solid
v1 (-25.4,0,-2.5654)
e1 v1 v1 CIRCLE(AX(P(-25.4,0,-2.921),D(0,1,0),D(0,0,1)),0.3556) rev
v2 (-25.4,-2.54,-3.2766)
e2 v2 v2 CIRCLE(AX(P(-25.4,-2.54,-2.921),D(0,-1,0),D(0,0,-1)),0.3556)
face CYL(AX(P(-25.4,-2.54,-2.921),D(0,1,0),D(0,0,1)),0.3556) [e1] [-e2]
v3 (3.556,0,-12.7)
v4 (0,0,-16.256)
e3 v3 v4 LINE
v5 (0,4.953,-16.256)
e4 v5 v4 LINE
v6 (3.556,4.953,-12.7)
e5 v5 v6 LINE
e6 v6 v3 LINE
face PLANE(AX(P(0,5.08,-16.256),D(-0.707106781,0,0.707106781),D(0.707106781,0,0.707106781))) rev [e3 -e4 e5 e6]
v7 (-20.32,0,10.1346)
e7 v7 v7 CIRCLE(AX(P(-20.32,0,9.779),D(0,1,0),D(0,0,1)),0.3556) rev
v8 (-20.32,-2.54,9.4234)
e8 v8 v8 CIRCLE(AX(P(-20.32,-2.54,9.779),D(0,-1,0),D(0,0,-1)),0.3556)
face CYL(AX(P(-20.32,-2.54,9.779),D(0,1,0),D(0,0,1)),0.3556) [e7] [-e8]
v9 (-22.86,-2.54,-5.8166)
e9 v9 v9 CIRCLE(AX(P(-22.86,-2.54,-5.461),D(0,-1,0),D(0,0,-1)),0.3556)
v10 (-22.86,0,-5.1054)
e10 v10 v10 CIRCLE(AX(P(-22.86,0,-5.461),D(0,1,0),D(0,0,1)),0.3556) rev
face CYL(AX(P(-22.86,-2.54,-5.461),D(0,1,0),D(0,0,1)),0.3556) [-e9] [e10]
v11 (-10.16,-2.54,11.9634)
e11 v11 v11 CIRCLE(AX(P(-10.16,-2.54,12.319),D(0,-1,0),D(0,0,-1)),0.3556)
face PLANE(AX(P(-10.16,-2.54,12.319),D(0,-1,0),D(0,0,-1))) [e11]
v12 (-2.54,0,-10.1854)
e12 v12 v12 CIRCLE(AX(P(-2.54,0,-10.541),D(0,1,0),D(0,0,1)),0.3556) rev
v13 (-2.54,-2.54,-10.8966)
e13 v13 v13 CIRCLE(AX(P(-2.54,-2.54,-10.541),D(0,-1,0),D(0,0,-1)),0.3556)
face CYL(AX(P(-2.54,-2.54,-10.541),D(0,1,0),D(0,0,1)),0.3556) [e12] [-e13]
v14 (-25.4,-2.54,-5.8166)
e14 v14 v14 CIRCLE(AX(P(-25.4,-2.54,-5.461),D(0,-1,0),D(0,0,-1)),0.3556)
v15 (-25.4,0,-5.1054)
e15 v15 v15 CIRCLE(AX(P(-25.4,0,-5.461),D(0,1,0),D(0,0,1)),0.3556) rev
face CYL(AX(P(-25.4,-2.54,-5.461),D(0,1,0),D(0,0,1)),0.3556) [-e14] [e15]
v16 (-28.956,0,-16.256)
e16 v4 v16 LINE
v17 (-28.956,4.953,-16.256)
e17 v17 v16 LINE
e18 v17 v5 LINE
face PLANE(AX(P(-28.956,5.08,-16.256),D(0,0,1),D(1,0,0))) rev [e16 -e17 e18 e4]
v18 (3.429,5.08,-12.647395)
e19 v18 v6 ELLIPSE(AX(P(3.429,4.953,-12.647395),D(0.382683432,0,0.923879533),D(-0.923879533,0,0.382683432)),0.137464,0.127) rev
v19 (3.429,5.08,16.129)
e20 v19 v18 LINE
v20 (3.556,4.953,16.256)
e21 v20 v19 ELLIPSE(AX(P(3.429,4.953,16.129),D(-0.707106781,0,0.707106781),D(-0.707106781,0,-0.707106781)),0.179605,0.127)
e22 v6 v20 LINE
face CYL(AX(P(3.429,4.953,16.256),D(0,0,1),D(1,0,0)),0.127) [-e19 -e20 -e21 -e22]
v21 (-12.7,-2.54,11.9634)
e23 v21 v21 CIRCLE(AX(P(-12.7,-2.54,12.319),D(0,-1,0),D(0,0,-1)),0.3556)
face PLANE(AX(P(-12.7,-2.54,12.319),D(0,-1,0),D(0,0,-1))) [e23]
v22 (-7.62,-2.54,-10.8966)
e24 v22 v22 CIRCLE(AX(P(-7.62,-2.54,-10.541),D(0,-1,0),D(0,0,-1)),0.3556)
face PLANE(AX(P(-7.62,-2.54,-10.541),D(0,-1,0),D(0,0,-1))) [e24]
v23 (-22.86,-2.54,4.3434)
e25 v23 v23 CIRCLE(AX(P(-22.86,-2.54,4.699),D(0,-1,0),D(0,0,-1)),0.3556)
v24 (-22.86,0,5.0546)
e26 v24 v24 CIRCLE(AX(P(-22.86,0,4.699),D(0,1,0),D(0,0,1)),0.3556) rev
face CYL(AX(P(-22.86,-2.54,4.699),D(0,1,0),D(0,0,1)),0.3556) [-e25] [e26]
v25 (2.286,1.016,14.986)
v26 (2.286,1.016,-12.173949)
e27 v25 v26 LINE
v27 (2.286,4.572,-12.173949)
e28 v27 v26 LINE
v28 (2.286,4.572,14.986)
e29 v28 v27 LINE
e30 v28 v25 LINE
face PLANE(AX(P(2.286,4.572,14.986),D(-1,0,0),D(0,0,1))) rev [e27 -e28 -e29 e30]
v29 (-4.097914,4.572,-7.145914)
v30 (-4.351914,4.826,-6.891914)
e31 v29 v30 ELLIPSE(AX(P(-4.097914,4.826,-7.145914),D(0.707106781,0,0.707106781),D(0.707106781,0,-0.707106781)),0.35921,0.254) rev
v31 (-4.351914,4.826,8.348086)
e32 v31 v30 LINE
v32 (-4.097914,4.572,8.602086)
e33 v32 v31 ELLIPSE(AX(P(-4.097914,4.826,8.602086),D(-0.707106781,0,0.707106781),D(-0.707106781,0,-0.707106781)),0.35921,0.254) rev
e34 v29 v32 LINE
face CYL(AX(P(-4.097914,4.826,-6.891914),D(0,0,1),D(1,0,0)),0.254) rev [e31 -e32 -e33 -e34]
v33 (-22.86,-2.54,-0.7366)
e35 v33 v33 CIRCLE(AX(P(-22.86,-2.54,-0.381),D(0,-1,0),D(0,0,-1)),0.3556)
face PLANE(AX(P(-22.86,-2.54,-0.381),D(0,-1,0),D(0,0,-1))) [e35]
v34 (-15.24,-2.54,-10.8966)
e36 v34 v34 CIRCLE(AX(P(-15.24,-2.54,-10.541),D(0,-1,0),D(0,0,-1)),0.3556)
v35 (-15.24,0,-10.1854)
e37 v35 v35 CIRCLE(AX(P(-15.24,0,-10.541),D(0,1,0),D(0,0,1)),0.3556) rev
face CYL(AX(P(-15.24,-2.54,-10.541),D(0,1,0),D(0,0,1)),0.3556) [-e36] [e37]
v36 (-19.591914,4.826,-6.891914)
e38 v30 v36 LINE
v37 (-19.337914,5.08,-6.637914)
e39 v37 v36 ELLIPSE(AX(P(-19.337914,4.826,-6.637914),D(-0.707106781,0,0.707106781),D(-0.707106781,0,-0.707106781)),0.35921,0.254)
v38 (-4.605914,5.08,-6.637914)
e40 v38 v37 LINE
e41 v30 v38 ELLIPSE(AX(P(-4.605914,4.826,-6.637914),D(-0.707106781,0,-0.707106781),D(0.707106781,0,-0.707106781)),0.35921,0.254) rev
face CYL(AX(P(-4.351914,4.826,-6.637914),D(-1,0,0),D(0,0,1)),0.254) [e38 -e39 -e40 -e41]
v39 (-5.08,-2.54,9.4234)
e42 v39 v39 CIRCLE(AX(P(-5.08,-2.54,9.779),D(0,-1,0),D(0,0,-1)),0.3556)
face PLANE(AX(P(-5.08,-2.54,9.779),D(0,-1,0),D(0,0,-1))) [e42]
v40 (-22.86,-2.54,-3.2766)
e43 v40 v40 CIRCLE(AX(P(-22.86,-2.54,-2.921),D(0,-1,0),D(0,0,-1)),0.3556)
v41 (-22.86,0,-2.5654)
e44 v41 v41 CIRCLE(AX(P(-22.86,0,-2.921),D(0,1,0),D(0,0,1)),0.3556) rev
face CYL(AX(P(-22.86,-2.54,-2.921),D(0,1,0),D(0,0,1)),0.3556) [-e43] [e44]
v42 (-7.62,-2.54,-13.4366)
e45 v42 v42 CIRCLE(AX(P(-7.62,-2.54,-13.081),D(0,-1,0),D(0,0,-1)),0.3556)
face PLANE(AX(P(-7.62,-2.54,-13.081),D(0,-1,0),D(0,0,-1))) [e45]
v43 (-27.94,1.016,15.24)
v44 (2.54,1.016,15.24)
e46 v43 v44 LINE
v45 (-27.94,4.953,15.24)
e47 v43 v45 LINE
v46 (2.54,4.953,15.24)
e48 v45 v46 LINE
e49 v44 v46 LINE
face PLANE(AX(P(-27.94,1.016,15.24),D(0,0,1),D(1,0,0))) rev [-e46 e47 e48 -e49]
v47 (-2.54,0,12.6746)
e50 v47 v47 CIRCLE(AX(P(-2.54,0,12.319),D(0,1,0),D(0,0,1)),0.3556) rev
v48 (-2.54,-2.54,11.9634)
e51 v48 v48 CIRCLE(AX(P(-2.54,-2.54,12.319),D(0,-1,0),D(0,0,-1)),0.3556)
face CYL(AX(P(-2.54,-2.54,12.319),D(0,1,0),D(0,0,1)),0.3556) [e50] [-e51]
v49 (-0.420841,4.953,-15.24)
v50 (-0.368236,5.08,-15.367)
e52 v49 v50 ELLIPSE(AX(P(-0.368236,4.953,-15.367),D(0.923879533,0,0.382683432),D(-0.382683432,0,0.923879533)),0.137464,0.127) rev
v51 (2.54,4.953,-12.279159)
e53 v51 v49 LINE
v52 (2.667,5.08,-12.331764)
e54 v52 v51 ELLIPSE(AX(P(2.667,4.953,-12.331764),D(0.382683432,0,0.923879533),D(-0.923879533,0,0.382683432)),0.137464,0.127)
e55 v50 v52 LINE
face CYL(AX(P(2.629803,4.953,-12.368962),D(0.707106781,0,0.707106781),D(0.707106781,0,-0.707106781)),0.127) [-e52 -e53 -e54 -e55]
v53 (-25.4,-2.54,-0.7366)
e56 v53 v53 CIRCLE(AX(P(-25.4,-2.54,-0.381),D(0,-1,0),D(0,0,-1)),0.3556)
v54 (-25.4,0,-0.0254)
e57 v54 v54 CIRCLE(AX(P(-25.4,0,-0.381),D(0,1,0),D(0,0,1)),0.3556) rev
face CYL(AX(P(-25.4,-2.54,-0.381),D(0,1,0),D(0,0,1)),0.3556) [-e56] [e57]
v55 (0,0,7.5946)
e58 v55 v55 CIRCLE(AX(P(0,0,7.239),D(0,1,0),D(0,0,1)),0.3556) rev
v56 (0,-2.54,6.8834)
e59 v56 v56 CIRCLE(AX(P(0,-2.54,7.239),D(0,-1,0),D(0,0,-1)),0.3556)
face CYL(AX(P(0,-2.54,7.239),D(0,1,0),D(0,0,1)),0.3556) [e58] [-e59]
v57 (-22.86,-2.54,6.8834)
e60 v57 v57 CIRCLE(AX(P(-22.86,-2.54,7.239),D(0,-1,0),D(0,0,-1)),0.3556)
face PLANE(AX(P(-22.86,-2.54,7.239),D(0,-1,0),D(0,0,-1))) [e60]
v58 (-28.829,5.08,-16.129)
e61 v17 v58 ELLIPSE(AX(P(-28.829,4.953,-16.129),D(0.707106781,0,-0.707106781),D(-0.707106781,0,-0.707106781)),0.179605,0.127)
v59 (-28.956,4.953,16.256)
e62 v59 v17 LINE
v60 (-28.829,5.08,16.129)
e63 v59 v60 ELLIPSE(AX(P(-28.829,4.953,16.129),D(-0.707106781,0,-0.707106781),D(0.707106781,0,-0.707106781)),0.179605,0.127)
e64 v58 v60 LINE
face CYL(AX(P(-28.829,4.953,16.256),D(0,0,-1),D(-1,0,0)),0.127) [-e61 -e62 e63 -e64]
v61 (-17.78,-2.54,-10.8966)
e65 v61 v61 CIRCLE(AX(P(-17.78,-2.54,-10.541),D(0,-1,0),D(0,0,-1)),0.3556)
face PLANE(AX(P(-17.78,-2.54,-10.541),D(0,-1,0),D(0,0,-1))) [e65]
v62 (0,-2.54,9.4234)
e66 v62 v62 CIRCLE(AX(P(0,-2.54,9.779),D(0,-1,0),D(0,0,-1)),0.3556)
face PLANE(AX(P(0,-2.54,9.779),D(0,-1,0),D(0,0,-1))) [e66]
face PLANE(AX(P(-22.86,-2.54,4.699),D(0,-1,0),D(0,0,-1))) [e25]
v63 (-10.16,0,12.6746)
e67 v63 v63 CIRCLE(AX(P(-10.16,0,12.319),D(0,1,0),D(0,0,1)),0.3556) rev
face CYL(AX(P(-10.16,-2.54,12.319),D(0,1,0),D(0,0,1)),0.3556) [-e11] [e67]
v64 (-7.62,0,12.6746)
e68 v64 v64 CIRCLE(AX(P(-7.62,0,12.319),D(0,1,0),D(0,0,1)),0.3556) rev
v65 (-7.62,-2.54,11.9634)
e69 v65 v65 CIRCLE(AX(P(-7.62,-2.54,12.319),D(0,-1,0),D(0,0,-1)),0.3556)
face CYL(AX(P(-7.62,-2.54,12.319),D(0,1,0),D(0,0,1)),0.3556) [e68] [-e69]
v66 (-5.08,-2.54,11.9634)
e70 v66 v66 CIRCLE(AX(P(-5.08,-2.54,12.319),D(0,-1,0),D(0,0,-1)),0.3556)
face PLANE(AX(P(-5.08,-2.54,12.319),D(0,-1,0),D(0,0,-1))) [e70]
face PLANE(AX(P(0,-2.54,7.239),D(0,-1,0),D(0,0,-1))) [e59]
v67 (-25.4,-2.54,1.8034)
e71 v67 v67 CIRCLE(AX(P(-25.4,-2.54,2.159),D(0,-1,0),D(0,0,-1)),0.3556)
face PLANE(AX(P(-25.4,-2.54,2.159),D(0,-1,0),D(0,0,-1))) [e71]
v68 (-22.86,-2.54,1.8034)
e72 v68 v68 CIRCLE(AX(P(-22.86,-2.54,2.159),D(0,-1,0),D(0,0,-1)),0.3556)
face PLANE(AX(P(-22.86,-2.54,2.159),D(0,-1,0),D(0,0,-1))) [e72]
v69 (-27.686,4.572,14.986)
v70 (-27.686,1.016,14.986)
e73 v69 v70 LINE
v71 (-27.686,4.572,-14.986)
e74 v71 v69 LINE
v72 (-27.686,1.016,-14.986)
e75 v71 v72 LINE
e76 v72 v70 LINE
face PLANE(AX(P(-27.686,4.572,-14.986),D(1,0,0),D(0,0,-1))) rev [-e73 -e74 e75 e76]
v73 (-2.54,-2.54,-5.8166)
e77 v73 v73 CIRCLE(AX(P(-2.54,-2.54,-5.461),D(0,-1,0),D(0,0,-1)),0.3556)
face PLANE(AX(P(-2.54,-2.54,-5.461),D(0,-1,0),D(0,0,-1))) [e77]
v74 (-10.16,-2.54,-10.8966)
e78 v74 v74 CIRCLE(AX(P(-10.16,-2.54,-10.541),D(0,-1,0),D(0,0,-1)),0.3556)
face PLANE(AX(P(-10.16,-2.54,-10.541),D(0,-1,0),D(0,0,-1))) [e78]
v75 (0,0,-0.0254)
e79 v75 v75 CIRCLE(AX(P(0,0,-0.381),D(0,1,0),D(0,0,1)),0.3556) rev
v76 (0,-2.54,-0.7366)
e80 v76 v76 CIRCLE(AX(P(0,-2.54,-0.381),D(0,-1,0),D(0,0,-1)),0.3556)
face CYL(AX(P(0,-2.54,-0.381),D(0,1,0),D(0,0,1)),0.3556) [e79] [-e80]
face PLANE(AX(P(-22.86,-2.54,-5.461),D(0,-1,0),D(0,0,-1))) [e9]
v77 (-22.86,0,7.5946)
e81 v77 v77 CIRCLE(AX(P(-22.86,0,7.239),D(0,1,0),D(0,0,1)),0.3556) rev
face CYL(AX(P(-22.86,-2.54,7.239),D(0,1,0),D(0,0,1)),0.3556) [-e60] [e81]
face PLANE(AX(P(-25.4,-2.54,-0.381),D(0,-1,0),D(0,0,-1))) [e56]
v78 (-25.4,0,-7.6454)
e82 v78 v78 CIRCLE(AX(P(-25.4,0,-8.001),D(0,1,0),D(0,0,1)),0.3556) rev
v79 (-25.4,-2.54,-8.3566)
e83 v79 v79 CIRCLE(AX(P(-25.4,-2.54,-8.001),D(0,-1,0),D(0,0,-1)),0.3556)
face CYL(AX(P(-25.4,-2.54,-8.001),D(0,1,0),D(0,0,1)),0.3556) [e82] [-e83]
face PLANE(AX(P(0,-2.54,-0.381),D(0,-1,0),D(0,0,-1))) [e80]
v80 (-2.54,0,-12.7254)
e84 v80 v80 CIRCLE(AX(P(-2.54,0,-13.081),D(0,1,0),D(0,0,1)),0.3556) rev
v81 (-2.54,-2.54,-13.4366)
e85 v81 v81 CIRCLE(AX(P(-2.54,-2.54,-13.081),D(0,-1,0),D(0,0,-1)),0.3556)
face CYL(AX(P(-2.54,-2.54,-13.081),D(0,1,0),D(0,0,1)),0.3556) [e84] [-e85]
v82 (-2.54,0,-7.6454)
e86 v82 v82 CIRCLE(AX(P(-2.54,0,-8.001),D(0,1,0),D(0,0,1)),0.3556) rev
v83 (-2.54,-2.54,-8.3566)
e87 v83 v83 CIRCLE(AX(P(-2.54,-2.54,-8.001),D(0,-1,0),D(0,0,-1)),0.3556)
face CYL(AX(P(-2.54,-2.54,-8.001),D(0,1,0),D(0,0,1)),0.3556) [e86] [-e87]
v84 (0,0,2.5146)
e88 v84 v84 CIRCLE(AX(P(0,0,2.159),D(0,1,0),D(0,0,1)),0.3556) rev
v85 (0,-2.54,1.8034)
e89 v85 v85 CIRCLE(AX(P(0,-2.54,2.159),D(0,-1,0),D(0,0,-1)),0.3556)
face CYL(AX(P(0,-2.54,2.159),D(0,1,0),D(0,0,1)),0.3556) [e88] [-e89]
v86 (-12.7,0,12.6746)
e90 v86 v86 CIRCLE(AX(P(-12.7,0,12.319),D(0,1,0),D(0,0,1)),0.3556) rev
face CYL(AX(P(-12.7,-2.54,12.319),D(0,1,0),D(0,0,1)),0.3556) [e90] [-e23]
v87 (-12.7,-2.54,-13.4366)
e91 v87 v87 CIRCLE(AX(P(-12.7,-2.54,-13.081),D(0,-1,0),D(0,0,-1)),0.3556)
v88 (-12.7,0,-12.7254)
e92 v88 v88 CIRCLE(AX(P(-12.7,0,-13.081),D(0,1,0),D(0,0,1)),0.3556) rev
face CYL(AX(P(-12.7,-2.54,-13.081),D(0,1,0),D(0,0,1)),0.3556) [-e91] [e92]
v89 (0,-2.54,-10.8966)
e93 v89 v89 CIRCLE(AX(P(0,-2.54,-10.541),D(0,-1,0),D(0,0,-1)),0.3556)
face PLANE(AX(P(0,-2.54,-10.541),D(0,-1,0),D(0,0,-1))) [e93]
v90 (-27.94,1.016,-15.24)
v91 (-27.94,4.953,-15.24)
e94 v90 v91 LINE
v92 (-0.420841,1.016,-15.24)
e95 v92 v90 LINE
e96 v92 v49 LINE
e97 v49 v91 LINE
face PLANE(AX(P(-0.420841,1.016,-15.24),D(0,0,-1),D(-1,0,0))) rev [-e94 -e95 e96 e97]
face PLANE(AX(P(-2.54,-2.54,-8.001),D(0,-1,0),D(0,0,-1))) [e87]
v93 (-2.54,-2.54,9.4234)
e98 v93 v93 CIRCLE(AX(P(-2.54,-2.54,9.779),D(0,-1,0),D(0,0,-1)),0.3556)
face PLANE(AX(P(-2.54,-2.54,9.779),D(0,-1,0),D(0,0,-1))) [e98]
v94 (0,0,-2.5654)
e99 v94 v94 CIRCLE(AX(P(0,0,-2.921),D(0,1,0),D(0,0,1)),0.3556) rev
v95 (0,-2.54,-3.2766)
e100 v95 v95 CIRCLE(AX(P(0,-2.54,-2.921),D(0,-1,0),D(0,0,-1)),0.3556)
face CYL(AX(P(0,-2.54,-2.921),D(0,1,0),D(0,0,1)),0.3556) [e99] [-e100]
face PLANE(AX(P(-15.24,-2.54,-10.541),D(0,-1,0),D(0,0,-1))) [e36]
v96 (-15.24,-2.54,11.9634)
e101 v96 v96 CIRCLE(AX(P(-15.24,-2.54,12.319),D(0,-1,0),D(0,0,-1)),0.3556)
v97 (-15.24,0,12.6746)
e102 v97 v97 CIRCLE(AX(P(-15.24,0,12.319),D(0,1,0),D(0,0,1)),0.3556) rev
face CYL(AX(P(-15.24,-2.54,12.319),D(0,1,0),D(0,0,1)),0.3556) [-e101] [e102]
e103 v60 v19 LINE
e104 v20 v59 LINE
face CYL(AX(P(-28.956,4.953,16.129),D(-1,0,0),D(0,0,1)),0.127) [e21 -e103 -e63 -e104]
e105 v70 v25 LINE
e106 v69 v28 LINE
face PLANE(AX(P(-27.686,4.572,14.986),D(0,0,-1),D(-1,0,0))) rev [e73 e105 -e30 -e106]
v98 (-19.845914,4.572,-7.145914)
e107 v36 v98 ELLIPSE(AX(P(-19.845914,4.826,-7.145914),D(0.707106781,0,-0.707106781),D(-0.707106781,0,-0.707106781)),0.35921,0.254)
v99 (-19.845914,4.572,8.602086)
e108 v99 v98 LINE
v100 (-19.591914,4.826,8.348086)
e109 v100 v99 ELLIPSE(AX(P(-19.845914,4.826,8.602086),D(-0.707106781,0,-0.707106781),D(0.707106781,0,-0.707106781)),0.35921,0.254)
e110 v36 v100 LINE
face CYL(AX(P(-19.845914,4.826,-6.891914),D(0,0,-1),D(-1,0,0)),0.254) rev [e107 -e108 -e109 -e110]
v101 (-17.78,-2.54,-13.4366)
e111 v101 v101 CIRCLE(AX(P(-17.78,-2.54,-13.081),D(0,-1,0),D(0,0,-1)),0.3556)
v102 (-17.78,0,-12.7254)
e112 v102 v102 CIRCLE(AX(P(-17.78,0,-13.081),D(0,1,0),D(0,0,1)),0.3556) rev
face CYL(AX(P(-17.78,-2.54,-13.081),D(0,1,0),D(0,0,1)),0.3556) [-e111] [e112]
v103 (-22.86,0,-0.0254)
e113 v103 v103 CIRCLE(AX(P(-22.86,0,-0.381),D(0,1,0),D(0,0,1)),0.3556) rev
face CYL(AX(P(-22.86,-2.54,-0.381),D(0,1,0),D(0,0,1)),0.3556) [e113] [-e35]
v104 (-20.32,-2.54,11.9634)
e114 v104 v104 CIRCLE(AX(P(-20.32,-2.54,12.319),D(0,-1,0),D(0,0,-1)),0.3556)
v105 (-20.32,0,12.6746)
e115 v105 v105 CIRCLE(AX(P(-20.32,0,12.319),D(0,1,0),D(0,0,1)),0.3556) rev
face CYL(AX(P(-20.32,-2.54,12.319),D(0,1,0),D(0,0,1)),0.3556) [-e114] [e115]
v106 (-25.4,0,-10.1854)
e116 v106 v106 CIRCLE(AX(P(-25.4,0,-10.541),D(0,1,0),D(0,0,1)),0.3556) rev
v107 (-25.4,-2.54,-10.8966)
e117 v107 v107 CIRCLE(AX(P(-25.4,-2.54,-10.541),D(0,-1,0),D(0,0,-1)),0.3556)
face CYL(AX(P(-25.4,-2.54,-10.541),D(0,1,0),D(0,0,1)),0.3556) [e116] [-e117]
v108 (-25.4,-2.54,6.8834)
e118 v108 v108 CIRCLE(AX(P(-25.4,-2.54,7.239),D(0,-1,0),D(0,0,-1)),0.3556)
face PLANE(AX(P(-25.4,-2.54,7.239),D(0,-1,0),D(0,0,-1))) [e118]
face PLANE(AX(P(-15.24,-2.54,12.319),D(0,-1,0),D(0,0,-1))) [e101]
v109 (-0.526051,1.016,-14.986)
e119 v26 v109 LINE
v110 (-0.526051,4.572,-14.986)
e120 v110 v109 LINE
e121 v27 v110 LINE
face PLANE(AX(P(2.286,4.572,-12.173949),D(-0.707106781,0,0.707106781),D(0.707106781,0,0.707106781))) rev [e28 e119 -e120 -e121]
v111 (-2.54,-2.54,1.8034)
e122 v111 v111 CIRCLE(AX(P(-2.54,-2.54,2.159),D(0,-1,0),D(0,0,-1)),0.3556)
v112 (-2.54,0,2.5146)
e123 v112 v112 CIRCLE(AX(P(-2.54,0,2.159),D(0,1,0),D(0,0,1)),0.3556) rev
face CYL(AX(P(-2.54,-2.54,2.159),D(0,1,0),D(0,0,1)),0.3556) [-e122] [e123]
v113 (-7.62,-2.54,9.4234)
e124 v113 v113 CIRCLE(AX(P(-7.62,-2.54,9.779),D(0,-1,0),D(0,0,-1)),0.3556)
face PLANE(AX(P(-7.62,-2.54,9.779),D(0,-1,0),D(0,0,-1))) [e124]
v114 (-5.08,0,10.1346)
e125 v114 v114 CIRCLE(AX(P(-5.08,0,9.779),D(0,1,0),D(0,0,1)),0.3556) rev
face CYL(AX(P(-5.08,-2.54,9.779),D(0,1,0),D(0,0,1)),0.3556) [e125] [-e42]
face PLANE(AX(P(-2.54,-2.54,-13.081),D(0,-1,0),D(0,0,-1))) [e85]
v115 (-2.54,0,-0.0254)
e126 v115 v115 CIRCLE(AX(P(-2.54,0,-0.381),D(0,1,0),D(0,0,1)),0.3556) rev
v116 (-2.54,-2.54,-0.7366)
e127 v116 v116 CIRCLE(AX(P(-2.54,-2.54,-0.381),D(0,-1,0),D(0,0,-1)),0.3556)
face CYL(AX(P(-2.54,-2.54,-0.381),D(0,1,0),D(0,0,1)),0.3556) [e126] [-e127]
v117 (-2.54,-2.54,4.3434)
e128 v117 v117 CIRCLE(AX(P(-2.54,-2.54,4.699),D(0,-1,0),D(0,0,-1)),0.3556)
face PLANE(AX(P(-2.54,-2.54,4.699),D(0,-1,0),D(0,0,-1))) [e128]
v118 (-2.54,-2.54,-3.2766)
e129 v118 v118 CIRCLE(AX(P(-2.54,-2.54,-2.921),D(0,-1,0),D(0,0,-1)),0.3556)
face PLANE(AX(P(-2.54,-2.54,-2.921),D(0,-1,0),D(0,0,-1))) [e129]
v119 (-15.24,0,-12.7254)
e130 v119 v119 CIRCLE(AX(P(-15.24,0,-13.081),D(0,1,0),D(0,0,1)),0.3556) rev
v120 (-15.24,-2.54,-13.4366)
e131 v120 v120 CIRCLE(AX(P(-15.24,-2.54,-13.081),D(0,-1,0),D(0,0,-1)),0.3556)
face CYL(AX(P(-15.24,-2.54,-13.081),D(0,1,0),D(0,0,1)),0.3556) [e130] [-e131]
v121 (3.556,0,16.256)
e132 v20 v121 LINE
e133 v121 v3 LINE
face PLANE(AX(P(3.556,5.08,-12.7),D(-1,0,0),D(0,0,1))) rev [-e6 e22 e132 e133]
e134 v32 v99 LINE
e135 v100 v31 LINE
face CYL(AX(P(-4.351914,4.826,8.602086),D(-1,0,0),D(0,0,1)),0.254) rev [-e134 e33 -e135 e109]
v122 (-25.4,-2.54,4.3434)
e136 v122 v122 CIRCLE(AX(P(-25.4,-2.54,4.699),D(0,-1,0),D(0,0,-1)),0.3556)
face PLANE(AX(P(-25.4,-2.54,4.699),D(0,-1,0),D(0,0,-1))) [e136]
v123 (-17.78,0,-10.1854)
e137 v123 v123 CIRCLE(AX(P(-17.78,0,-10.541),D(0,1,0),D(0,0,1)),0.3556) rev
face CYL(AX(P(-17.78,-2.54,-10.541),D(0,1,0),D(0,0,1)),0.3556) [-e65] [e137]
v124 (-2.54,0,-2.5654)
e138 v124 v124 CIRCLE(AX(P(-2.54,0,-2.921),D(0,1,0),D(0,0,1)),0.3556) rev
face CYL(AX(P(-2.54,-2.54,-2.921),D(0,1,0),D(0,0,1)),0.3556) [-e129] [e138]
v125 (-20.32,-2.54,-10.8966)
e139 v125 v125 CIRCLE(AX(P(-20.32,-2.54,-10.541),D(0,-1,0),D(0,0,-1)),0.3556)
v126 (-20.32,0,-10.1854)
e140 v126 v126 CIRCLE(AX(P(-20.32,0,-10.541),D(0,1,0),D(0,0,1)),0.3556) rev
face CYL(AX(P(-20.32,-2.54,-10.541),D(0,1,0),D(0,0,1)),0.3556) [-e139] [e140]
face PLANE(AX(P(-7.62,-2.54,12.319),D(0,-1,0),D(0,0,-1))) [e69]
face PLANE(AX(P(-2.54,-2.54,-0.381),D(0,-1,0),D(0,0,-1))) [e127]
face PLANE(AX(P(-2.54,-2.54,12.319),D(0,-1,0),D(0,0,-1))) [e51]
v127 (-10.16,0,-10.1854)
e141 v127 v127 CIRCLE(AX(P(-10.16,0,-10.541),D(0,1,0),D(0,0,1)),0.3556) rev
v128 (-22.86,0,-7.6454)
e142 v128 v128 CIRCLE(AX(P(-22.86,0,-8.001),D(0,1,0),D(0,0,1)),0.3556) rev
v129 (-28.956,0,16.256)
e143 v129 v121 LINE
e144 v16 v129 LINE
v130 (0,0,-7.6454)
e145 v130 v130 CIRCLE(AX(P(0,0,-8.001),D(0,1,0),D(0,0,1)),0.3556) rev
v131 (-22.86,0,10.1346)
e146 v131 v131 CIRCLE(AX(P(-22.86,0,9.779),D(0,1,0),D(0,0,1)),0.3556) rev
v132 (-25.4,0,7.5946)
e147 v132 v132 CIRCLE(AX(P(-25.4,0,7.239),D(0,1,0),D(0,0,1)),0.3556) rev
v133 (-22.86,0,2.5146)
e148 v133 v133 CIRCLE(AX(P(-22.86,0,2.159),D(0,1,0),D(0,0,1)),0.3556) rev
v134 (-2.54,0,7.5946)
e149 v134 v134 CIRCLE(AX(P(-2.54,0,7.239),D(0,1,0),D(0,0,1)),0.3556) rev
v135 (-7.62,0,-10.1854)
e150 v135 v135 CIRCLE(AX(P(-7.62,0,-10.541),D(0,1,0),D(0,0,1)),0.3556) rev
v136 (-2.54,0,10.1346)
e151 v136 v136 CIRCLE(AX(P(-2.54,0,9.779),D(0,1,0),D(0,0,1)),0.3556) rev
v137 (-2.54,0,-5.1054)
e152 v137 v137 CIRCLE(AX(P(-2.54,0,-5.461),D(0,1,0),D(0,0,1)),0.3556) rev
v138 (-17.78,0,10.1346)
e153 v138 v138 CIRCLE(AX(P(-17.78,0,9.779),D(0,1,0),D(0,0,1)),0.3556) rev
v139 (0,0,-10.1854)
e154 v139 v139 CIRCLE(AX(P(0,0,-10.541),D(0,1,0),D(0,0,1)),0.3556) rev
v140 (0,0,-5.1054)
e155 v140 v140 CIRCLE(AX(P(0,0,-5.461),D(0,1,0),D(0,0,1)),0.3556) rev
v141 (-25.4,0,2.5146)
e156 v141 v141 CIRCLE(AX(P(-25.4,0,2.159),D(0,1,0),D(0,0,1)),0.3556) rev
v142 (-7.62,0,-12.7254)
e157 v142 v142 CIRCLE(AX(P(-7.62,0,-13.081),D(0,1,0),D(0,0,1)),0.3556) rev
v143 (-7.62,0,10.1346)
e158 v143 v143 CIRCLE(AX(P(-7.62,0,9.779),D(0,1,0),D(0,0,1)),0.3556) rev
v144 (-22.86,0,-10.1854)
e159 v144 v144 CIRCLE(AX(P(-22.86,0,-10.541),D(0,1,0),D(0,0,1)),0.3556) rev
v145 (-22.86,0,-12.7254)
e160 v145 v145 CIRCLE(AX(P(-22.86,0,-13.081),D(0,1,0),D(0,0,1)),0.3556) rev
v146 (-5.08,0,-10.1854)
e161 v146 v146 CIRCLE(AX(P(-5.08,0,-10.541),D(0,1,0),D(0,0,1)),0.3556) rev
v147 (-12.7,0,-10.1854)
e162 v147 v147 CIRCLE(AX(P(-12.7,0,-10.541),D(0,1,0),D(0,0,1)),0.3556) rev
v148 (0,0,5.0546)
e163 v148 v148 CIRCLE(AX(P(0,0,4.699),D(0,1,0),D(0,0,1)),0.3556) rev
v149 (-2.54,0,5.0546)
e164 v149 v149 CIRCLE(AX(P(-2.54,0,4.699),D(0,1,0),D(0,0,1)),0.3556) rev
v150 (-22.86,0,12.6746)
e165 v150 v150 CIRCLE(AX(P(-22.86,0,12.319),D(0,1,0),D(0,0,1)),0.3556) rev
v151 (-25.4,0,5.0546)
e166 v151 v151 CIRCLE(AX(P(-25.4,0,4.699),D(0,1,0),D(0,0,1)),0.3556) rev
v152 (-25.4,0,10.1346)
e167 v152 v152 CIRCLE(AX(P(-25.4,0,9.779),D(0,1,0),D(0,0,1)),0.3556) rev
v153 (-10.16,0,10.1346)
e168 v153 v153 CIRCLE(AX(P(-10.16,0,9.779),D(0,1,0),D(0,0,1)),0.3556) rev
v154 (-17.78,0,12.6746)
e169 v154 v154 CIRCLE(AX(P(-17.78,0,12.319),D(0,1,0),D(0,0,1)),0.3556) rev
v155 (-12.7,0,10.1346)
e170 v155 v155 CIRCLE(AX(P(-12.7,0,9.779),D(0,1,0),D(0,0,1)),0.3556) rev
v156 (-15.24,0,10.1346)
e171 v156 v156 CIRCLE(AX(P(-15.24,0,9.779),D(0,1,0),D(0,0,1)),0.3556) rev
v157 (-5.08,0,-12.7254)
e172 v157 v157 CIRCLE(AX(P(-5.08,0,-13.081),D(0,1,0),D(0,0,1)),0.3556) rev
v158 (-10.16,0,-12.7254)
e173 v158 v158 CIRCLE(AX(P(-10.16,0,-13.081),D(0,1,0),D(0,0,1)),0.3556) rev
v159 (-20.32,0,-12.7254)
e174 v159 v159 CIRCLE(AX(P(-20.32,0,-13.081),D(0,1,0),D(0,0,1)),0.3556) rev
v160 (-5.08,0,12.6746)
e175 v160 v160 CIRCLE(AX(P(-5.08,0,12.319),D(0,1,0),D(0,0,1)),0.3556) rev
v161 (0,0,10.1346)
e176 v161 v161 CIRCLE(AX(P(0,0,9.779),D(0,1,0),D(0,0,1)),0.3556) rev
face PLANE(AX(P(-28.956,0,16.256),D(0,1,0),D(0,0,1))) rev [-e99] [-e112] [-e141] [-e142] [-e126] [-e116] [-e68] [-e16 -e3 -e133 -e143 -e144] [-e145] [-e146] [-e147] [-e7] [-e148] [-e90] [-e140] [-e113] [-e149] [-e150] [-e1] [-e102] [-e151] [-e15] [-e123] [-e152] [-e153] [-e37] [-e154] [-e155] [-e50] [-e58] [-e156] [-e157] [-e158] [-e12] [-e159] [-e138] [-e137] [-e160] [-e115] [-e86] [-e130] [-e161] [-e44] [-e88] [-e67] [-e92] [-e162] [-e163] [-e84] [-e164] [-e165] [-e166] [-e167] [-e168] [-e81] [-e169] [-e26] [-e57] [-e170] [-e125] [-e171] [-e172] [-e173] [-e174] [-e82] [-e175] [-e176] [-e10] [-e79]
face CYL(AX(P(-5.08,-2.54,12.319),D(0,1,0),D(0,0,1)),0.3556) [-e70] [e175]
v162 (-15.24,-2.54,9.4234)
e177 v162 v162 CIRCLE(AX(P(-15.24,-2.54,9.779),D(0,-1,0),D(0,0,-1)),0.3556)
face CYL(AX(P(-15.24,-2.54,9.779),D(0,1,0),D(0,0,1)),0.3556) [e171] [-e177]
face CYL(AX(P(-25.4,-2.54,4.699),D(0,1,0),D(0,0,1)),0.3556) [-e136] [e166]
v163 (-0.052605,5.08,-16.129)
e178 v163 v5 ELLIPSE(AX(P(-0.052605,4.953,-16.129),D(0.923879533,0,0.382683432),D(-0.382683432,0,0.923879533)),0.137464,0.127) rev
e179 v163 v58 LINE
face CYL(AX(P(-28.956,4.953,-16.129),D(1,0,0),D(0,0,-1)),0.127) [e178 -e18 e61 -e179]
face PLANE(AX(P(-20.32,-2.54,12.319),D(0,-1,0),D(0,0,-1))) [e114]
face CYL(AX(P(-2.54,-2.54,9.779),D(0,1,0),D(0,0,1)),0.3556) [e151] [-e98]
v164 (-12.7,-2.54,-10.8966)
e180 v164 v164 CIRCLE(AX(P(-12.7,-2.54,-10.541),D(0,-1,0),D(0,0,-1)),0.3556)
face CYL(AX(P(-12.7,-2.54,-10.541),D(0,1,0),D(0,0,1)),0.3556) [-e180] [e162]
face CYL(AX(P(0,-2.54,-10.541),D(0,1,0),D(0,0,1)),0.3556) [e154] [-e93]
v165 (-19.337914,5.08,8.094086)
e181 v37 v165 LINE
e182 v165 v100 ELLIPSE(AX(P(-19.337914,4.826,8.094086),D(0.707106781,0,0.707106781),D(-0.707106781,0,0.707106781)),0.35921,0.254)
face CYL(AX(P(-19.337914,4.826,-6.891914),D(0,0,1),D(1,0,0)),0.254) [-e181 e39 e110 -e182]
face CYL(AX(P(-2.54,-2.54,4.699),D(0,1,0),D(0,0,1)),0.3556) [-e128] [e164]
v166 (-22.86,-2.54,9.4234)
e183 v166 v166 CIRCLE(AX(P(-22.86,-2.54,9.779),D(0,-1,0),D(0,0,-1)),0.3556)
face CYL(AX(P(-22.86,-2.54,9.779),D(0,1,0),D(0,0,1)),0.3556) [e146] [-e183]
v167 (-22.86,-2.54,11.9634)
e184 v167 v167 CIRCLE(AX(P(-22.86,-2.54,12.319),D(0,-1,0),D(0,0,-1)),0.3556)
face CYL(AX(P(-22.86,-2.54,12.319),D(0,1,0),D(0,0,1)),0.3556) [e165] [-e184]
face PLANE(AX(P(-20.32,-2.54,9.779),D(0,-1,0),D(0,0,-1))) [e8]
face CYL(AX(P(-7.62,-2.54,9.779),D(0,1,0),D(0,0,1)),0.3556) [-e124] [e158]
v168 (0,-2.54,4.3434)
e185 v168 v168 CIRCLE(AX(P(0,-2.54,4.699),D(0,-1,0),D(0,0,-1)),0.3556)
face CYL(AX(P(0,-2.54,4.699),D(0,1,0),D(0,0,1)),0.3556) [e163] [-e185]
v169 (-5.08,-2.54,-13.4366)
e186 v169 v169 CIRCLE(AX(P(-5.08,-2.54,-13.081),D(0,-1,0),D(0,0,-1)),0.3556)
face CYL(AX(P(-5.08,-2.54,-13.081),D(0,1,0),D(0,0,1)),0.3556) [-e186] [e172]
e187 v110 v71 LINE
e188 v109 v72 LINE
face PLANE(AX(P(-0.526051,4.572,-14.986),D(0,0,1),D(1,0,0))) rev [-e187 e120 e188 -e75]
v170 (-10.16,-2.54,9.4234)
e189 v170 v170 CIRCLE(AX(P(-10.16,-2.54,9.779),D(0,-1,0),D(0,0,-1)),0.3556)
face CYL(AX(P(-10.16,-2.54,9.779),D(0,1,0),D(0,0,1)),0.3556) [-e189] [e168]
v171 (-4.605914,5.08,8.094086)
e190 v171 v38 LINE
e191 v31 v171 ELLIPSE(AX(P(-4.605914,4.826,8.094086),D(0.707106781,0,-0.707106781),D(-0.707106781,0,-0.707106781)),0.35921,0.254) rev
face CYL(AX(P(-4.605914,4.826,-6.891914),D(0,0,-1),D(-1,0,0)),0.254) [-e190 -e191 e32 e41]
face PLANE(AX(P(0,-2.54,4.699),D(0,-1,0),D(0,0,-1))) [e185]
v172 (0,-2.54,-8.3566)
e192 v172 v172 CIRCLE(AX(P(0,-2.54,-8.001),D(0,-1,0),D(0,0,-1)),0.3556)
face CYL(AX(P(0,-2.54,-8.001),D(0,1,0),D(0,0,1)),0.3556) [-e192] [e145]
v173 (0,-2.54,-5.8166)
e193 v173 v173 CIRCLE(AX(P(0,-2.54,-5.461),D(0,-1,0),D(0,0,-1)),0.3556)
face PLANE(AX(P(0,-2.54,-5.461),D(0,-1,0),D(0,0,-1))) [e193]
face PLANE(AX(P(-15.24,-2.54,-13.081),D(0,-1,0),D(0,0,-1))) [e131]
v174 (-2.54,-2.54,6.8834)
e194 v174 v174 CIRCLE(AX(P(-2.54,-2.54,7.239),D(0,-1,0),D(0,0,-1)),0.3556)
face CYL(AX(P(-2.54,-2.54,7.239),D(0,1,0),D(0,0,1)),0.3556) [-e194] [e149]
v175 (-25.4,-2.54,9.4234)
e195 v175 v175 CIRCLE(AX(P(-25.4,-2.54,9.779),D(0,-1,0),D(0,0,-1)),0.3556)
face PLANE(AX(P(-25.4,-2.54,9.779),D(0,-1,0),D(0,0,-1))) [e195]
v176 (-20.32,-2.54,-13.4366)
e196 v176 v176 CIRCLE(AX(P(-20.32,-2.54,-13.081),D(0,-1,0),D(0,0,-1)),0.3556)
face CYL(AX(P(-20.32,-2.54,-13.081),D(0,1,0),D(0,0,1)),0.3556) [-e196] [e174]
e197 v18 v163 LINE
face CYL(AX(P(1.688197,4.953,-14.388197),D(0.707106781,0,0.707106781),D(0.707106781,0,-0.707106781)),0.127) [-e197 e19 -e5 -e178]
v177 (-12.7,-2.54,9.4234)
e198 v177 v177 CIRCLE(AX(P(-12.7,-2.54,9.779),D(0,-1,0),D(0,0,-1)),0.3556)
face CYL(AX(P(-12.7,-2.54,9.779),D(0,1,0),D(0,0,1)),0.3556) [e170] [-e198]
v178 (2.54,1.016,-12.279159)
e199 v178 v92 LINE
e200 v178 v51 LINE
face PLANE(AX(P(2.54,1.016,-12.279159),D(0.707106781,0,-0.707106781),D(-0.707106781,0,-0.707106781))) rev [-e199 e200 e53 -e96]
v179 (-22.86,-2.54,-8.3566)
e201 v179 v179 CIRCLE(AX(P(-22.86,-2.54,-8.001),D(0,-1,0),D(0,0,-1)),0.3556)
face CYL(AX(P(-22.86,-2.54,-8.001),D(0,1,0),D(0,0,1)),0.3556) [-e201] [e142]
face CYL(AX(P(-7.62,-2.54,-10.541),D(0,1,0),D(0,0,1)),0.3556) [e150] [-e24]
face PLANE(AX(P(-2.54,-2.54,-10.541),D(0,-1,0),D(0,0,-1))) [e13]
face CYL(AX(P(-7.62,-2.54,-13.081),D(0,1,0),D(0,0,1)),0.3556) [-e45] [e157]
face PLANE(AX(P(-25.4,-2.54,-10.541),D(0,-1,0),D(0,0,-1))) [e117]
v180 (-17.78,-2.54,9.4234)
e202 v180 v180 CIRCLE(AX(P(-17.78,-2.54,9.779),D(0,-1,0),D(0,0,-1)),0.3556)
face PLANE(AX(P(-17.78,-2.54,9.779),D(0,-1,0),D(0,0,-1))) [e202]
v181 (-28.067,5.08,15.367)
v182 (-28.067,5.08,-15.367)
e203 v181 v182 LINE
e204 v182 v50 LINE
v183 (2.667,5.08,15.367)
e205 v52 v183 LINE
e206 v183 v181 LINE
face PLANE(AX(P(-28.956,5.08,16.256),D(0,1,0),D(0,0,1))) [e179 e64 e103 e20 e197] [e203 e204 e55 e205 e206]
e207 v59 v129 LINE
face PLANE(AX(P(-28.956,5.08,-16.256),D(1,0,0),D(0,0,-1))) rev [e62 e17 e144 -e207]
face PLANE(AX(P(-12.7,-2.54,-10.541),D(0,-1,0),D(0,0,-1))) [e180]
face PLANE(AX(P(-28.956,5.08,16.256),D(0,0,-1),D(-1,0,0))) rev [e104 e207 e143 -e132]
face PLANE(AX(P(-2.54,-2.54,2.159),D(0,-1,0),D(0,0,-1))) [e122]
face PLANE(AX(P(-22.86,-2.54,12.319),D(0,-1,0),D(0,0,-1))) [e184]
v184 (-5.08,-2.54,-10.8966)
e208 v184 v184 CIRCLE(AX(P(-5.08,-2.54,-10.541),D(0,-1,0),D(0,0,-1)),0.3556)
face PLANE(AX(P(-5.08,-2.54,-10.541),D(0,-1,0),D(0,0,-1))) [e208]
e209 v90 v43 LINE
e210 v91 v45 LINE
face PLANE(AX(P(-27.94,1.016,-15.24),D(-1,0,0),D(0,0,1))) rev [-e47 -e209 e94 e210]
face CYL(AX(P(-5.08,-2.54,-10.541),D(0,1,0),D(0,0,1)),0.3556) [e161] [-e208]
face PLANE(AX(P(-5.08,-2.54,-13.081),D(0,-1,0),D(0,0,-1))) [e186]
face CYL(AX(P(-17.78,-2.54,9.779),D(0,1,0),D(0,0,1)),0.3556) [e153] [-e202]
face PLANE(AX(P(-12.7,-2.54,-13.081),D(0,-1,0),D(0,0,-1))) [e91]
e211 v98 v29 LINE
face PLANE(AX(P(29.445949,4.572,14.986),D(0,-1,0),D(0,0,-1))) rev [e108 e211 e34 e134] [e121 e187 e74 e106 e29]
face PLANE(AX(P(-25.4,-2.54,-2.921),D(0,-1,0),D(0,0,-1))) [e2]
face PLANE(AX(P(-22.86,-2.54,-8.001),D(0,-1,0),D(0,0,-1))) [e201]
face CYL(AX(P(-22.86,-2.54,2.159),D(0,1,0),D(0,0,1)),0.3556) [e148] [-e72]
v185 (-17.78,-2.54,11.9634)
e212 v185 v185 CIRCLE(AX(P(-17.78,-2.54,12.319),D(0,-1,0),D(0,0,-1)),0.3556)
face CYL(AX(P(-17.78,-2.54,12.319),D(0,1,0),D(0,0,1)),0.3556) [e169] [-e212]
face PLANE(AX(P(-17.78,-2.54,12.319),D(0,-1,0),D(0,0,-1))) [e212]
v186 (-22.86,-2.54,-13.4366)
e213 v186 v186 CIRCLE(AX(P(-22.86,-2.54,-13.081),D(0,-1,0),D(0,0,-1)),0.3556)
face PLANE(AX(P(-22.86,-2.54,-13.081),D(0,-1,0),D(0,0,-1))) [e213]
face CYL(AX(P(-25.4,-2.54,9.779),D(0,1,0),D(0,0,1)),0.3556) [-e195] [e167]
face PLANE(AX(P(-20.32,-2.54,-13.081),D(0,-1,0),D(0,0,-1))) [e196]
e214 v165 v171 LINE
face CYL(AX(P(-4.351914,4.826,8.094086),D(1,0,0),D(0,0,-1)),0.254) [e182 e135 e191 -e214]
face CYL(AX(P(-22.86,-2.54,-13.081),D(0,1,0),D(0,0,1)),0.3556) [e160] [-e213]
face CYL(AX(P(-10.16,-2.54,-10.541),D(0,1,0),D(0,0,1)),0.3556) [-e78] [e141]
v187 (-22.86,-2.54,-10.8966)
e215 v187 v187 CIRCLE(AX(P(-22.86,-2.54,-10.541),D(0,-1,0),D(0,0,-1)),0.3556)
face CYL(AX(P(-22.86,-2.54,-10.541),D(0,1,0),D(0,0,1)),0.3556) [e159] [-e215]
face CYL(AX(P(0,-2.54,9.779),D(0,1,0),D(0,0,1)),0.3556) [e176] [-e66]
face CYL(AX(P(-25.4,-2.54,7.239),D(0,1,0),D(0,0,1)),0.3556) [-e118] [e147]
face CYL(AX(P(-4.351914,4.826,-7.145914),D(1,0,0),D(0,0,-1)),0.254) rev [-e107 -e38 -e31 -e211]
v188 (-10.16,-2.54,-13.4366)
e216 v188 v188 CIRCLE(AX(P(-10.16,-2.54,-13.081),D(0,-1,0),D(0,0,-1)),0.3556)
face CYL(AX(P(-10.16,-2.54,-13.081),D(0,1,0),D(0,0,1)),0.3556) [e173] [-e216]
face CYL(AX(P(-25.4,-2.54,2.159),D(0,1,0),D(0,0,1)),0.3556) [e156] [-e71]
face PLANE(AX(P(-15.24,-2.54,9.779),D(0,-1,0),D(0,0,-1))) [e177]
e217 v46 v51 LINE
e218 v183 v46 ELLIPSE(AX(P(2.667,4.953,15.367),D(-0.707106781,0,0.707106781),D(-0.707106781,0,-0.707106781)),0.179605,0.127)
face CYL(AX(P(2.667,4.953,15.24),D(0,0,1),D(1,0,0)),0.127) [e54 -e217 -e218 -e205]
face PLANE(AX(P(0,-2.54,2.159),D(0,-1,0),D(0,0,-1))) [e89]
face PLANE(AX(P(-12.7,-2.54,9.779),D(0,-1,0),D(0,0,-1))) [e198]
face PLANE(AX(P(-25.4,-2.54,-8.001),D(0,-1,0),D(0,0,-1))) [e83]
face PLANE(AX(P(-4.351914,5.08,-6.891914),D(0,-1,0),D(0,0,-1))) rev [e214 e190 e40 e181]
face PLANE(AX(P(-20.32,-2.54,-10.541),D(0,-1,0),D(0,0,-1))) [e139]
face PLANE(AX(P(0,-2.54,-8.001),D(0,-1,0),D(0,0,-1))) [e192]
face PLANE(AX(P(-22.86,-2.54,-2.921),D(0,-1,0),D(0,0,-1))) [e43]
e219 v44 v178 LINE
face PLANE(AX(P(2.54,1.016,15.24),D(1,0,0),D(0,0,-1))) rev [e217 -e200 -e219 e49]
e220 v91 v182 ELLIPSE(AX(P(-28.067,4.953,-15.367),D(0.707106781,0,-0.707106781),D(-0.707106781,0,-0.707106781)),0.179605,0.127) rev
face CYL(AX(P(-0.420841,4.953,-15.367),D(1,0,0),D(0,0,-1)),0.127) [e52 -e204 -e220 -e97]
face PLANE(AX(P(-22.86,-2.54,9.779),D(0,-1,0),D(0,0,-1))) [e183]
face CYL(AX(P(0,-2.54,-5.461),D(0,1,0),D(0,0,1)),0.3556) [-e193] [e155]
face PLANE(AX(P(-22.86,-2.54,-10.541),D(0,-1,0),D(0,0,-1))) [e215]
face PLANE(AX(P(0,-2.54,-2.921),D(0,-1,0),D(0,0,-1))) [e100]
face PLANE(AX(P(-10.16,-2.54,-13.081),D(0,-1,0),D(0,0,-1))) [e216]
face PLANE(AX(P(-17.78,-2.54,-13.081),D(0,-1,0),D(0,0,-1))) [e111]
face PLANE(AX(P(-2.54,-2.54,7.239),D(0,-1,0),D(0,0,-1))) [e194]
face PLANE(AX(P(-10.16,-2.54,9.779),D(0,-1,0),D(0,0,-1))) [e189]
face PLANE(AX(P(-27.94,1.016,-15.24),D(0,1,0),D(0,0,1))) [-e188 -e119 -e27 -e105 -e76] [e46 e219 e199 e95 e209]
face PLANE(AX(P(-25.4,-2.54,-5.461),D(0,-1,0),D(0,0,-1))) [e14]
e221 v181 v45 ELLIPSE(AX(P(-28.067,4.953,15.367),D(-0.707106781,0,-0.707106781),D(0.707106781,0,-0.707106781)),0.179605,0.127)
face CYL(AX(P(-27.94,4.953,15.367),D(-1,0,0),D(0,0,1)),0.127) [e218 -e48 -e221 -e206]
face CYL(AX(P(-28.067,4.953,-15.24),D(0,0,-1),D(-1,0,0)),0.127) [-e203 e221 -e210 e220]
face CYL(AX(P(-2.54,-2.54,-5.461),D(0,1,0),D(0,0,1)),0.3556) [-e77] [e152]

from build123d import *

# Parameters (mm, degrees)
BASE_EXTRUDE_DEPTH   = 5.08
CUT_EXTRUDE1_DEPTH   = 4.064
BOSS_EXTRUDE1_DEPTH  = 3.556
SKETCH4_W            = 15.24
SKETCH4_H            = 15.24
BOSS_EXTRUDE2_DEPTH  = 0.508
FILLET2_R            = 0.127
FILLET3_R            = 0.254
SKETCH5_R            = 0.3556
BOSS_EXTRUDE3_DEPTH  = 2.54
LPATTERN1_COUNT      = 10
LPATTERN1_PITCH      = 2.54
LPATTERN1_COUNT_DIR2 = 11
LPATTERN1_PITCH_DIR2 = 2.54
LPATTERN2_COUNT      = 2
LPATTERN2_PITCH      = 2.54
LPATTERN2_COUNT_DIR2 = 11
LPATTERN2_PITCH_DIR2 = 2.54


with BuildPart() as part:
    # Sketch1 → Base-Extrude (new body)
    with BuildSketch(Plane(origin=(0, 0, 0), x_dir=(1, 0, 0), z_dir=(0, 1, 0))):
        Polygon((0, 16.256), (3.556, 12.7), (3.556, -16.256), (-28.956, -16.256), (-28.956, 16.256), align=None)
    extrude(amount=BASE_EXTRUDE_DEPTH)

    # Sketch2 → Cut-Extrude1 (cut)
    with BuildSketch(Plane(origin=(0, 5.08, 0), x_dir=(-1, 0, 0), z_dir=(0, 1, 0))):
        Polygon((27.94, -15.24), (27.94, 15.24), (-2.54, 15.24), (-2.54, -12.279159021), (0.420840979, -15.24), align=None)
    extrude(amount=-CUT_EXTRUDE1_DEPTH, mode=Mode.SUBTRACT)

    # Sketch3 → Boss-Extrude1 (add)
    with BuildSketch(Plane(origin=(0, 1.016, 0), x_dir=(-1, 0, 0), z_dir=(0, 1, 0))):
        Polygon((0.526051224, -14.986), (27.686, -14.986), (27.686, 14.986), (-2.286, 14.986), (-2.286, -12.173948776), align=None)
    extrude(amount=BOSS_EXTRUDE1_DEPTH)

    # Sketch4 → Boss-Extrude2 (add)
    with BuildSketch(Plane(origin=(0, 4.572, 0), x_dir=(-1, 0, 0), z_dir=(0, 1, 0))):
        with Locations((11.971914099, 0.728085901)):
            Rectangle(SKETCH4_W, SKETCH4_H)
    extrude(amount=BOSS_EXTRUDE2_DEPTH)

    # Fillet2
    fillet2_edges = [part.edges().sort_by_distance(p)[0] for p in [
        (3.556, 5.08, 1.778),
        (1.778, 5.08, -14.478),
        (-14.478, 5.08, -16.256),
        (-14.18042049, 5.08, -15.24),
        (-27.94, 5.08, 0),
        (-12.7, 5.08, 15.24),
        (2.54, 5.08, 1.48042049),
        (1.05957951, 5.08, -13.75957951),
        (-28.956, 5.08, 0),
        (-12.7, 5.08, 16.256),
    ]]
    fillet(fillet2_edges, radius=FILLET2_R)

    # Fillet3
    fillet3_edges = [part.edges().sort_by_distance(p)[0] for p in [
        (-4.351914099, 4.572, 0.728085901),
        (-11.971914099, 4.572, -6.891914099),
        (-19.591914099, 4.572, 0.728085901),
        (-11.971914099, 4.572, 8.348085901),
        (-4.351914099, 5.08, 0.728085901),
        (-11.971914099, 5.08, -6.891914099),
        (-19.591914099, 5.08, 0.728085901),
        (-11.971914099, 5.08, 8.348085901),
    ]]
    fillet(fillet3_edges, radius=FILLET3_R - 0.0001)  # a hair under: the kernel refuses the full size

    # Sketch5 → Boss-Extrude3 (add)
    with BuildSketch(Plane.XZ):
        with Locations(Location((0, -10.541, 0), (0, 0, 90))):
            Circle(SKETCH5_R)
    boss_extrude3 = extrude(amount=BOSS_EXTRUDE3_DEPTH)

    # LPattern1: Boss-Extrude3 10 × 11, 51 skipped
    with Locations(*[(-j * LPATTERN1_PITCH_DIR2, 0, i * LPATTERN1_PITCH) for i in range(LPATTERN1_COUNT) for j in range(LPATTERN1_COUNT_DIR2) if (i, j) not in ((0, 0), (1, 2), (1, 3), (1, 4), (1, 5), (1, 6), (1, 7), (1, 8), (2, 2), (2, 3), (2, 4), (2, 5), (2, 6), (2, 7), (2, 8), (3, 2), (3, 3), (3, 4), (3, 5), (3, 6), (3, 7), (3, 8), (4, 2), (4, 3), (4, 4), (4, 5), (4, 6), (4, 7), (4, 8), (5, 2), (5, 3), (5, 4), (5, 5), (5, 6), (5, 7), (5, 8), (6, 2), (6, 3), (6, 4), (6, 5), (6, 6), (6, 7), (6, 8), (7, 2), (7, 3), (7, 4), (7, 5), (7, 6), (7, 7), (7, 8), (9, 0), (9, 10))]):
        add(boss_extrude3)

    # LPattern2: Boss-Extrude3 2 × 11, 2 skipped
    with Locations(*[(-j * LPATTERN2_PITCH_DIR2, 0, -i * LPATTERN2_PITCH) for i in range(LPATTERN2_COUNT) for j in range(LPATTERN2_COUNT_DIR2) if (i, j) not in ((0, 0), (1, 0), (1, 10))]):
        add(boss_extrude3)


solid = part.part
